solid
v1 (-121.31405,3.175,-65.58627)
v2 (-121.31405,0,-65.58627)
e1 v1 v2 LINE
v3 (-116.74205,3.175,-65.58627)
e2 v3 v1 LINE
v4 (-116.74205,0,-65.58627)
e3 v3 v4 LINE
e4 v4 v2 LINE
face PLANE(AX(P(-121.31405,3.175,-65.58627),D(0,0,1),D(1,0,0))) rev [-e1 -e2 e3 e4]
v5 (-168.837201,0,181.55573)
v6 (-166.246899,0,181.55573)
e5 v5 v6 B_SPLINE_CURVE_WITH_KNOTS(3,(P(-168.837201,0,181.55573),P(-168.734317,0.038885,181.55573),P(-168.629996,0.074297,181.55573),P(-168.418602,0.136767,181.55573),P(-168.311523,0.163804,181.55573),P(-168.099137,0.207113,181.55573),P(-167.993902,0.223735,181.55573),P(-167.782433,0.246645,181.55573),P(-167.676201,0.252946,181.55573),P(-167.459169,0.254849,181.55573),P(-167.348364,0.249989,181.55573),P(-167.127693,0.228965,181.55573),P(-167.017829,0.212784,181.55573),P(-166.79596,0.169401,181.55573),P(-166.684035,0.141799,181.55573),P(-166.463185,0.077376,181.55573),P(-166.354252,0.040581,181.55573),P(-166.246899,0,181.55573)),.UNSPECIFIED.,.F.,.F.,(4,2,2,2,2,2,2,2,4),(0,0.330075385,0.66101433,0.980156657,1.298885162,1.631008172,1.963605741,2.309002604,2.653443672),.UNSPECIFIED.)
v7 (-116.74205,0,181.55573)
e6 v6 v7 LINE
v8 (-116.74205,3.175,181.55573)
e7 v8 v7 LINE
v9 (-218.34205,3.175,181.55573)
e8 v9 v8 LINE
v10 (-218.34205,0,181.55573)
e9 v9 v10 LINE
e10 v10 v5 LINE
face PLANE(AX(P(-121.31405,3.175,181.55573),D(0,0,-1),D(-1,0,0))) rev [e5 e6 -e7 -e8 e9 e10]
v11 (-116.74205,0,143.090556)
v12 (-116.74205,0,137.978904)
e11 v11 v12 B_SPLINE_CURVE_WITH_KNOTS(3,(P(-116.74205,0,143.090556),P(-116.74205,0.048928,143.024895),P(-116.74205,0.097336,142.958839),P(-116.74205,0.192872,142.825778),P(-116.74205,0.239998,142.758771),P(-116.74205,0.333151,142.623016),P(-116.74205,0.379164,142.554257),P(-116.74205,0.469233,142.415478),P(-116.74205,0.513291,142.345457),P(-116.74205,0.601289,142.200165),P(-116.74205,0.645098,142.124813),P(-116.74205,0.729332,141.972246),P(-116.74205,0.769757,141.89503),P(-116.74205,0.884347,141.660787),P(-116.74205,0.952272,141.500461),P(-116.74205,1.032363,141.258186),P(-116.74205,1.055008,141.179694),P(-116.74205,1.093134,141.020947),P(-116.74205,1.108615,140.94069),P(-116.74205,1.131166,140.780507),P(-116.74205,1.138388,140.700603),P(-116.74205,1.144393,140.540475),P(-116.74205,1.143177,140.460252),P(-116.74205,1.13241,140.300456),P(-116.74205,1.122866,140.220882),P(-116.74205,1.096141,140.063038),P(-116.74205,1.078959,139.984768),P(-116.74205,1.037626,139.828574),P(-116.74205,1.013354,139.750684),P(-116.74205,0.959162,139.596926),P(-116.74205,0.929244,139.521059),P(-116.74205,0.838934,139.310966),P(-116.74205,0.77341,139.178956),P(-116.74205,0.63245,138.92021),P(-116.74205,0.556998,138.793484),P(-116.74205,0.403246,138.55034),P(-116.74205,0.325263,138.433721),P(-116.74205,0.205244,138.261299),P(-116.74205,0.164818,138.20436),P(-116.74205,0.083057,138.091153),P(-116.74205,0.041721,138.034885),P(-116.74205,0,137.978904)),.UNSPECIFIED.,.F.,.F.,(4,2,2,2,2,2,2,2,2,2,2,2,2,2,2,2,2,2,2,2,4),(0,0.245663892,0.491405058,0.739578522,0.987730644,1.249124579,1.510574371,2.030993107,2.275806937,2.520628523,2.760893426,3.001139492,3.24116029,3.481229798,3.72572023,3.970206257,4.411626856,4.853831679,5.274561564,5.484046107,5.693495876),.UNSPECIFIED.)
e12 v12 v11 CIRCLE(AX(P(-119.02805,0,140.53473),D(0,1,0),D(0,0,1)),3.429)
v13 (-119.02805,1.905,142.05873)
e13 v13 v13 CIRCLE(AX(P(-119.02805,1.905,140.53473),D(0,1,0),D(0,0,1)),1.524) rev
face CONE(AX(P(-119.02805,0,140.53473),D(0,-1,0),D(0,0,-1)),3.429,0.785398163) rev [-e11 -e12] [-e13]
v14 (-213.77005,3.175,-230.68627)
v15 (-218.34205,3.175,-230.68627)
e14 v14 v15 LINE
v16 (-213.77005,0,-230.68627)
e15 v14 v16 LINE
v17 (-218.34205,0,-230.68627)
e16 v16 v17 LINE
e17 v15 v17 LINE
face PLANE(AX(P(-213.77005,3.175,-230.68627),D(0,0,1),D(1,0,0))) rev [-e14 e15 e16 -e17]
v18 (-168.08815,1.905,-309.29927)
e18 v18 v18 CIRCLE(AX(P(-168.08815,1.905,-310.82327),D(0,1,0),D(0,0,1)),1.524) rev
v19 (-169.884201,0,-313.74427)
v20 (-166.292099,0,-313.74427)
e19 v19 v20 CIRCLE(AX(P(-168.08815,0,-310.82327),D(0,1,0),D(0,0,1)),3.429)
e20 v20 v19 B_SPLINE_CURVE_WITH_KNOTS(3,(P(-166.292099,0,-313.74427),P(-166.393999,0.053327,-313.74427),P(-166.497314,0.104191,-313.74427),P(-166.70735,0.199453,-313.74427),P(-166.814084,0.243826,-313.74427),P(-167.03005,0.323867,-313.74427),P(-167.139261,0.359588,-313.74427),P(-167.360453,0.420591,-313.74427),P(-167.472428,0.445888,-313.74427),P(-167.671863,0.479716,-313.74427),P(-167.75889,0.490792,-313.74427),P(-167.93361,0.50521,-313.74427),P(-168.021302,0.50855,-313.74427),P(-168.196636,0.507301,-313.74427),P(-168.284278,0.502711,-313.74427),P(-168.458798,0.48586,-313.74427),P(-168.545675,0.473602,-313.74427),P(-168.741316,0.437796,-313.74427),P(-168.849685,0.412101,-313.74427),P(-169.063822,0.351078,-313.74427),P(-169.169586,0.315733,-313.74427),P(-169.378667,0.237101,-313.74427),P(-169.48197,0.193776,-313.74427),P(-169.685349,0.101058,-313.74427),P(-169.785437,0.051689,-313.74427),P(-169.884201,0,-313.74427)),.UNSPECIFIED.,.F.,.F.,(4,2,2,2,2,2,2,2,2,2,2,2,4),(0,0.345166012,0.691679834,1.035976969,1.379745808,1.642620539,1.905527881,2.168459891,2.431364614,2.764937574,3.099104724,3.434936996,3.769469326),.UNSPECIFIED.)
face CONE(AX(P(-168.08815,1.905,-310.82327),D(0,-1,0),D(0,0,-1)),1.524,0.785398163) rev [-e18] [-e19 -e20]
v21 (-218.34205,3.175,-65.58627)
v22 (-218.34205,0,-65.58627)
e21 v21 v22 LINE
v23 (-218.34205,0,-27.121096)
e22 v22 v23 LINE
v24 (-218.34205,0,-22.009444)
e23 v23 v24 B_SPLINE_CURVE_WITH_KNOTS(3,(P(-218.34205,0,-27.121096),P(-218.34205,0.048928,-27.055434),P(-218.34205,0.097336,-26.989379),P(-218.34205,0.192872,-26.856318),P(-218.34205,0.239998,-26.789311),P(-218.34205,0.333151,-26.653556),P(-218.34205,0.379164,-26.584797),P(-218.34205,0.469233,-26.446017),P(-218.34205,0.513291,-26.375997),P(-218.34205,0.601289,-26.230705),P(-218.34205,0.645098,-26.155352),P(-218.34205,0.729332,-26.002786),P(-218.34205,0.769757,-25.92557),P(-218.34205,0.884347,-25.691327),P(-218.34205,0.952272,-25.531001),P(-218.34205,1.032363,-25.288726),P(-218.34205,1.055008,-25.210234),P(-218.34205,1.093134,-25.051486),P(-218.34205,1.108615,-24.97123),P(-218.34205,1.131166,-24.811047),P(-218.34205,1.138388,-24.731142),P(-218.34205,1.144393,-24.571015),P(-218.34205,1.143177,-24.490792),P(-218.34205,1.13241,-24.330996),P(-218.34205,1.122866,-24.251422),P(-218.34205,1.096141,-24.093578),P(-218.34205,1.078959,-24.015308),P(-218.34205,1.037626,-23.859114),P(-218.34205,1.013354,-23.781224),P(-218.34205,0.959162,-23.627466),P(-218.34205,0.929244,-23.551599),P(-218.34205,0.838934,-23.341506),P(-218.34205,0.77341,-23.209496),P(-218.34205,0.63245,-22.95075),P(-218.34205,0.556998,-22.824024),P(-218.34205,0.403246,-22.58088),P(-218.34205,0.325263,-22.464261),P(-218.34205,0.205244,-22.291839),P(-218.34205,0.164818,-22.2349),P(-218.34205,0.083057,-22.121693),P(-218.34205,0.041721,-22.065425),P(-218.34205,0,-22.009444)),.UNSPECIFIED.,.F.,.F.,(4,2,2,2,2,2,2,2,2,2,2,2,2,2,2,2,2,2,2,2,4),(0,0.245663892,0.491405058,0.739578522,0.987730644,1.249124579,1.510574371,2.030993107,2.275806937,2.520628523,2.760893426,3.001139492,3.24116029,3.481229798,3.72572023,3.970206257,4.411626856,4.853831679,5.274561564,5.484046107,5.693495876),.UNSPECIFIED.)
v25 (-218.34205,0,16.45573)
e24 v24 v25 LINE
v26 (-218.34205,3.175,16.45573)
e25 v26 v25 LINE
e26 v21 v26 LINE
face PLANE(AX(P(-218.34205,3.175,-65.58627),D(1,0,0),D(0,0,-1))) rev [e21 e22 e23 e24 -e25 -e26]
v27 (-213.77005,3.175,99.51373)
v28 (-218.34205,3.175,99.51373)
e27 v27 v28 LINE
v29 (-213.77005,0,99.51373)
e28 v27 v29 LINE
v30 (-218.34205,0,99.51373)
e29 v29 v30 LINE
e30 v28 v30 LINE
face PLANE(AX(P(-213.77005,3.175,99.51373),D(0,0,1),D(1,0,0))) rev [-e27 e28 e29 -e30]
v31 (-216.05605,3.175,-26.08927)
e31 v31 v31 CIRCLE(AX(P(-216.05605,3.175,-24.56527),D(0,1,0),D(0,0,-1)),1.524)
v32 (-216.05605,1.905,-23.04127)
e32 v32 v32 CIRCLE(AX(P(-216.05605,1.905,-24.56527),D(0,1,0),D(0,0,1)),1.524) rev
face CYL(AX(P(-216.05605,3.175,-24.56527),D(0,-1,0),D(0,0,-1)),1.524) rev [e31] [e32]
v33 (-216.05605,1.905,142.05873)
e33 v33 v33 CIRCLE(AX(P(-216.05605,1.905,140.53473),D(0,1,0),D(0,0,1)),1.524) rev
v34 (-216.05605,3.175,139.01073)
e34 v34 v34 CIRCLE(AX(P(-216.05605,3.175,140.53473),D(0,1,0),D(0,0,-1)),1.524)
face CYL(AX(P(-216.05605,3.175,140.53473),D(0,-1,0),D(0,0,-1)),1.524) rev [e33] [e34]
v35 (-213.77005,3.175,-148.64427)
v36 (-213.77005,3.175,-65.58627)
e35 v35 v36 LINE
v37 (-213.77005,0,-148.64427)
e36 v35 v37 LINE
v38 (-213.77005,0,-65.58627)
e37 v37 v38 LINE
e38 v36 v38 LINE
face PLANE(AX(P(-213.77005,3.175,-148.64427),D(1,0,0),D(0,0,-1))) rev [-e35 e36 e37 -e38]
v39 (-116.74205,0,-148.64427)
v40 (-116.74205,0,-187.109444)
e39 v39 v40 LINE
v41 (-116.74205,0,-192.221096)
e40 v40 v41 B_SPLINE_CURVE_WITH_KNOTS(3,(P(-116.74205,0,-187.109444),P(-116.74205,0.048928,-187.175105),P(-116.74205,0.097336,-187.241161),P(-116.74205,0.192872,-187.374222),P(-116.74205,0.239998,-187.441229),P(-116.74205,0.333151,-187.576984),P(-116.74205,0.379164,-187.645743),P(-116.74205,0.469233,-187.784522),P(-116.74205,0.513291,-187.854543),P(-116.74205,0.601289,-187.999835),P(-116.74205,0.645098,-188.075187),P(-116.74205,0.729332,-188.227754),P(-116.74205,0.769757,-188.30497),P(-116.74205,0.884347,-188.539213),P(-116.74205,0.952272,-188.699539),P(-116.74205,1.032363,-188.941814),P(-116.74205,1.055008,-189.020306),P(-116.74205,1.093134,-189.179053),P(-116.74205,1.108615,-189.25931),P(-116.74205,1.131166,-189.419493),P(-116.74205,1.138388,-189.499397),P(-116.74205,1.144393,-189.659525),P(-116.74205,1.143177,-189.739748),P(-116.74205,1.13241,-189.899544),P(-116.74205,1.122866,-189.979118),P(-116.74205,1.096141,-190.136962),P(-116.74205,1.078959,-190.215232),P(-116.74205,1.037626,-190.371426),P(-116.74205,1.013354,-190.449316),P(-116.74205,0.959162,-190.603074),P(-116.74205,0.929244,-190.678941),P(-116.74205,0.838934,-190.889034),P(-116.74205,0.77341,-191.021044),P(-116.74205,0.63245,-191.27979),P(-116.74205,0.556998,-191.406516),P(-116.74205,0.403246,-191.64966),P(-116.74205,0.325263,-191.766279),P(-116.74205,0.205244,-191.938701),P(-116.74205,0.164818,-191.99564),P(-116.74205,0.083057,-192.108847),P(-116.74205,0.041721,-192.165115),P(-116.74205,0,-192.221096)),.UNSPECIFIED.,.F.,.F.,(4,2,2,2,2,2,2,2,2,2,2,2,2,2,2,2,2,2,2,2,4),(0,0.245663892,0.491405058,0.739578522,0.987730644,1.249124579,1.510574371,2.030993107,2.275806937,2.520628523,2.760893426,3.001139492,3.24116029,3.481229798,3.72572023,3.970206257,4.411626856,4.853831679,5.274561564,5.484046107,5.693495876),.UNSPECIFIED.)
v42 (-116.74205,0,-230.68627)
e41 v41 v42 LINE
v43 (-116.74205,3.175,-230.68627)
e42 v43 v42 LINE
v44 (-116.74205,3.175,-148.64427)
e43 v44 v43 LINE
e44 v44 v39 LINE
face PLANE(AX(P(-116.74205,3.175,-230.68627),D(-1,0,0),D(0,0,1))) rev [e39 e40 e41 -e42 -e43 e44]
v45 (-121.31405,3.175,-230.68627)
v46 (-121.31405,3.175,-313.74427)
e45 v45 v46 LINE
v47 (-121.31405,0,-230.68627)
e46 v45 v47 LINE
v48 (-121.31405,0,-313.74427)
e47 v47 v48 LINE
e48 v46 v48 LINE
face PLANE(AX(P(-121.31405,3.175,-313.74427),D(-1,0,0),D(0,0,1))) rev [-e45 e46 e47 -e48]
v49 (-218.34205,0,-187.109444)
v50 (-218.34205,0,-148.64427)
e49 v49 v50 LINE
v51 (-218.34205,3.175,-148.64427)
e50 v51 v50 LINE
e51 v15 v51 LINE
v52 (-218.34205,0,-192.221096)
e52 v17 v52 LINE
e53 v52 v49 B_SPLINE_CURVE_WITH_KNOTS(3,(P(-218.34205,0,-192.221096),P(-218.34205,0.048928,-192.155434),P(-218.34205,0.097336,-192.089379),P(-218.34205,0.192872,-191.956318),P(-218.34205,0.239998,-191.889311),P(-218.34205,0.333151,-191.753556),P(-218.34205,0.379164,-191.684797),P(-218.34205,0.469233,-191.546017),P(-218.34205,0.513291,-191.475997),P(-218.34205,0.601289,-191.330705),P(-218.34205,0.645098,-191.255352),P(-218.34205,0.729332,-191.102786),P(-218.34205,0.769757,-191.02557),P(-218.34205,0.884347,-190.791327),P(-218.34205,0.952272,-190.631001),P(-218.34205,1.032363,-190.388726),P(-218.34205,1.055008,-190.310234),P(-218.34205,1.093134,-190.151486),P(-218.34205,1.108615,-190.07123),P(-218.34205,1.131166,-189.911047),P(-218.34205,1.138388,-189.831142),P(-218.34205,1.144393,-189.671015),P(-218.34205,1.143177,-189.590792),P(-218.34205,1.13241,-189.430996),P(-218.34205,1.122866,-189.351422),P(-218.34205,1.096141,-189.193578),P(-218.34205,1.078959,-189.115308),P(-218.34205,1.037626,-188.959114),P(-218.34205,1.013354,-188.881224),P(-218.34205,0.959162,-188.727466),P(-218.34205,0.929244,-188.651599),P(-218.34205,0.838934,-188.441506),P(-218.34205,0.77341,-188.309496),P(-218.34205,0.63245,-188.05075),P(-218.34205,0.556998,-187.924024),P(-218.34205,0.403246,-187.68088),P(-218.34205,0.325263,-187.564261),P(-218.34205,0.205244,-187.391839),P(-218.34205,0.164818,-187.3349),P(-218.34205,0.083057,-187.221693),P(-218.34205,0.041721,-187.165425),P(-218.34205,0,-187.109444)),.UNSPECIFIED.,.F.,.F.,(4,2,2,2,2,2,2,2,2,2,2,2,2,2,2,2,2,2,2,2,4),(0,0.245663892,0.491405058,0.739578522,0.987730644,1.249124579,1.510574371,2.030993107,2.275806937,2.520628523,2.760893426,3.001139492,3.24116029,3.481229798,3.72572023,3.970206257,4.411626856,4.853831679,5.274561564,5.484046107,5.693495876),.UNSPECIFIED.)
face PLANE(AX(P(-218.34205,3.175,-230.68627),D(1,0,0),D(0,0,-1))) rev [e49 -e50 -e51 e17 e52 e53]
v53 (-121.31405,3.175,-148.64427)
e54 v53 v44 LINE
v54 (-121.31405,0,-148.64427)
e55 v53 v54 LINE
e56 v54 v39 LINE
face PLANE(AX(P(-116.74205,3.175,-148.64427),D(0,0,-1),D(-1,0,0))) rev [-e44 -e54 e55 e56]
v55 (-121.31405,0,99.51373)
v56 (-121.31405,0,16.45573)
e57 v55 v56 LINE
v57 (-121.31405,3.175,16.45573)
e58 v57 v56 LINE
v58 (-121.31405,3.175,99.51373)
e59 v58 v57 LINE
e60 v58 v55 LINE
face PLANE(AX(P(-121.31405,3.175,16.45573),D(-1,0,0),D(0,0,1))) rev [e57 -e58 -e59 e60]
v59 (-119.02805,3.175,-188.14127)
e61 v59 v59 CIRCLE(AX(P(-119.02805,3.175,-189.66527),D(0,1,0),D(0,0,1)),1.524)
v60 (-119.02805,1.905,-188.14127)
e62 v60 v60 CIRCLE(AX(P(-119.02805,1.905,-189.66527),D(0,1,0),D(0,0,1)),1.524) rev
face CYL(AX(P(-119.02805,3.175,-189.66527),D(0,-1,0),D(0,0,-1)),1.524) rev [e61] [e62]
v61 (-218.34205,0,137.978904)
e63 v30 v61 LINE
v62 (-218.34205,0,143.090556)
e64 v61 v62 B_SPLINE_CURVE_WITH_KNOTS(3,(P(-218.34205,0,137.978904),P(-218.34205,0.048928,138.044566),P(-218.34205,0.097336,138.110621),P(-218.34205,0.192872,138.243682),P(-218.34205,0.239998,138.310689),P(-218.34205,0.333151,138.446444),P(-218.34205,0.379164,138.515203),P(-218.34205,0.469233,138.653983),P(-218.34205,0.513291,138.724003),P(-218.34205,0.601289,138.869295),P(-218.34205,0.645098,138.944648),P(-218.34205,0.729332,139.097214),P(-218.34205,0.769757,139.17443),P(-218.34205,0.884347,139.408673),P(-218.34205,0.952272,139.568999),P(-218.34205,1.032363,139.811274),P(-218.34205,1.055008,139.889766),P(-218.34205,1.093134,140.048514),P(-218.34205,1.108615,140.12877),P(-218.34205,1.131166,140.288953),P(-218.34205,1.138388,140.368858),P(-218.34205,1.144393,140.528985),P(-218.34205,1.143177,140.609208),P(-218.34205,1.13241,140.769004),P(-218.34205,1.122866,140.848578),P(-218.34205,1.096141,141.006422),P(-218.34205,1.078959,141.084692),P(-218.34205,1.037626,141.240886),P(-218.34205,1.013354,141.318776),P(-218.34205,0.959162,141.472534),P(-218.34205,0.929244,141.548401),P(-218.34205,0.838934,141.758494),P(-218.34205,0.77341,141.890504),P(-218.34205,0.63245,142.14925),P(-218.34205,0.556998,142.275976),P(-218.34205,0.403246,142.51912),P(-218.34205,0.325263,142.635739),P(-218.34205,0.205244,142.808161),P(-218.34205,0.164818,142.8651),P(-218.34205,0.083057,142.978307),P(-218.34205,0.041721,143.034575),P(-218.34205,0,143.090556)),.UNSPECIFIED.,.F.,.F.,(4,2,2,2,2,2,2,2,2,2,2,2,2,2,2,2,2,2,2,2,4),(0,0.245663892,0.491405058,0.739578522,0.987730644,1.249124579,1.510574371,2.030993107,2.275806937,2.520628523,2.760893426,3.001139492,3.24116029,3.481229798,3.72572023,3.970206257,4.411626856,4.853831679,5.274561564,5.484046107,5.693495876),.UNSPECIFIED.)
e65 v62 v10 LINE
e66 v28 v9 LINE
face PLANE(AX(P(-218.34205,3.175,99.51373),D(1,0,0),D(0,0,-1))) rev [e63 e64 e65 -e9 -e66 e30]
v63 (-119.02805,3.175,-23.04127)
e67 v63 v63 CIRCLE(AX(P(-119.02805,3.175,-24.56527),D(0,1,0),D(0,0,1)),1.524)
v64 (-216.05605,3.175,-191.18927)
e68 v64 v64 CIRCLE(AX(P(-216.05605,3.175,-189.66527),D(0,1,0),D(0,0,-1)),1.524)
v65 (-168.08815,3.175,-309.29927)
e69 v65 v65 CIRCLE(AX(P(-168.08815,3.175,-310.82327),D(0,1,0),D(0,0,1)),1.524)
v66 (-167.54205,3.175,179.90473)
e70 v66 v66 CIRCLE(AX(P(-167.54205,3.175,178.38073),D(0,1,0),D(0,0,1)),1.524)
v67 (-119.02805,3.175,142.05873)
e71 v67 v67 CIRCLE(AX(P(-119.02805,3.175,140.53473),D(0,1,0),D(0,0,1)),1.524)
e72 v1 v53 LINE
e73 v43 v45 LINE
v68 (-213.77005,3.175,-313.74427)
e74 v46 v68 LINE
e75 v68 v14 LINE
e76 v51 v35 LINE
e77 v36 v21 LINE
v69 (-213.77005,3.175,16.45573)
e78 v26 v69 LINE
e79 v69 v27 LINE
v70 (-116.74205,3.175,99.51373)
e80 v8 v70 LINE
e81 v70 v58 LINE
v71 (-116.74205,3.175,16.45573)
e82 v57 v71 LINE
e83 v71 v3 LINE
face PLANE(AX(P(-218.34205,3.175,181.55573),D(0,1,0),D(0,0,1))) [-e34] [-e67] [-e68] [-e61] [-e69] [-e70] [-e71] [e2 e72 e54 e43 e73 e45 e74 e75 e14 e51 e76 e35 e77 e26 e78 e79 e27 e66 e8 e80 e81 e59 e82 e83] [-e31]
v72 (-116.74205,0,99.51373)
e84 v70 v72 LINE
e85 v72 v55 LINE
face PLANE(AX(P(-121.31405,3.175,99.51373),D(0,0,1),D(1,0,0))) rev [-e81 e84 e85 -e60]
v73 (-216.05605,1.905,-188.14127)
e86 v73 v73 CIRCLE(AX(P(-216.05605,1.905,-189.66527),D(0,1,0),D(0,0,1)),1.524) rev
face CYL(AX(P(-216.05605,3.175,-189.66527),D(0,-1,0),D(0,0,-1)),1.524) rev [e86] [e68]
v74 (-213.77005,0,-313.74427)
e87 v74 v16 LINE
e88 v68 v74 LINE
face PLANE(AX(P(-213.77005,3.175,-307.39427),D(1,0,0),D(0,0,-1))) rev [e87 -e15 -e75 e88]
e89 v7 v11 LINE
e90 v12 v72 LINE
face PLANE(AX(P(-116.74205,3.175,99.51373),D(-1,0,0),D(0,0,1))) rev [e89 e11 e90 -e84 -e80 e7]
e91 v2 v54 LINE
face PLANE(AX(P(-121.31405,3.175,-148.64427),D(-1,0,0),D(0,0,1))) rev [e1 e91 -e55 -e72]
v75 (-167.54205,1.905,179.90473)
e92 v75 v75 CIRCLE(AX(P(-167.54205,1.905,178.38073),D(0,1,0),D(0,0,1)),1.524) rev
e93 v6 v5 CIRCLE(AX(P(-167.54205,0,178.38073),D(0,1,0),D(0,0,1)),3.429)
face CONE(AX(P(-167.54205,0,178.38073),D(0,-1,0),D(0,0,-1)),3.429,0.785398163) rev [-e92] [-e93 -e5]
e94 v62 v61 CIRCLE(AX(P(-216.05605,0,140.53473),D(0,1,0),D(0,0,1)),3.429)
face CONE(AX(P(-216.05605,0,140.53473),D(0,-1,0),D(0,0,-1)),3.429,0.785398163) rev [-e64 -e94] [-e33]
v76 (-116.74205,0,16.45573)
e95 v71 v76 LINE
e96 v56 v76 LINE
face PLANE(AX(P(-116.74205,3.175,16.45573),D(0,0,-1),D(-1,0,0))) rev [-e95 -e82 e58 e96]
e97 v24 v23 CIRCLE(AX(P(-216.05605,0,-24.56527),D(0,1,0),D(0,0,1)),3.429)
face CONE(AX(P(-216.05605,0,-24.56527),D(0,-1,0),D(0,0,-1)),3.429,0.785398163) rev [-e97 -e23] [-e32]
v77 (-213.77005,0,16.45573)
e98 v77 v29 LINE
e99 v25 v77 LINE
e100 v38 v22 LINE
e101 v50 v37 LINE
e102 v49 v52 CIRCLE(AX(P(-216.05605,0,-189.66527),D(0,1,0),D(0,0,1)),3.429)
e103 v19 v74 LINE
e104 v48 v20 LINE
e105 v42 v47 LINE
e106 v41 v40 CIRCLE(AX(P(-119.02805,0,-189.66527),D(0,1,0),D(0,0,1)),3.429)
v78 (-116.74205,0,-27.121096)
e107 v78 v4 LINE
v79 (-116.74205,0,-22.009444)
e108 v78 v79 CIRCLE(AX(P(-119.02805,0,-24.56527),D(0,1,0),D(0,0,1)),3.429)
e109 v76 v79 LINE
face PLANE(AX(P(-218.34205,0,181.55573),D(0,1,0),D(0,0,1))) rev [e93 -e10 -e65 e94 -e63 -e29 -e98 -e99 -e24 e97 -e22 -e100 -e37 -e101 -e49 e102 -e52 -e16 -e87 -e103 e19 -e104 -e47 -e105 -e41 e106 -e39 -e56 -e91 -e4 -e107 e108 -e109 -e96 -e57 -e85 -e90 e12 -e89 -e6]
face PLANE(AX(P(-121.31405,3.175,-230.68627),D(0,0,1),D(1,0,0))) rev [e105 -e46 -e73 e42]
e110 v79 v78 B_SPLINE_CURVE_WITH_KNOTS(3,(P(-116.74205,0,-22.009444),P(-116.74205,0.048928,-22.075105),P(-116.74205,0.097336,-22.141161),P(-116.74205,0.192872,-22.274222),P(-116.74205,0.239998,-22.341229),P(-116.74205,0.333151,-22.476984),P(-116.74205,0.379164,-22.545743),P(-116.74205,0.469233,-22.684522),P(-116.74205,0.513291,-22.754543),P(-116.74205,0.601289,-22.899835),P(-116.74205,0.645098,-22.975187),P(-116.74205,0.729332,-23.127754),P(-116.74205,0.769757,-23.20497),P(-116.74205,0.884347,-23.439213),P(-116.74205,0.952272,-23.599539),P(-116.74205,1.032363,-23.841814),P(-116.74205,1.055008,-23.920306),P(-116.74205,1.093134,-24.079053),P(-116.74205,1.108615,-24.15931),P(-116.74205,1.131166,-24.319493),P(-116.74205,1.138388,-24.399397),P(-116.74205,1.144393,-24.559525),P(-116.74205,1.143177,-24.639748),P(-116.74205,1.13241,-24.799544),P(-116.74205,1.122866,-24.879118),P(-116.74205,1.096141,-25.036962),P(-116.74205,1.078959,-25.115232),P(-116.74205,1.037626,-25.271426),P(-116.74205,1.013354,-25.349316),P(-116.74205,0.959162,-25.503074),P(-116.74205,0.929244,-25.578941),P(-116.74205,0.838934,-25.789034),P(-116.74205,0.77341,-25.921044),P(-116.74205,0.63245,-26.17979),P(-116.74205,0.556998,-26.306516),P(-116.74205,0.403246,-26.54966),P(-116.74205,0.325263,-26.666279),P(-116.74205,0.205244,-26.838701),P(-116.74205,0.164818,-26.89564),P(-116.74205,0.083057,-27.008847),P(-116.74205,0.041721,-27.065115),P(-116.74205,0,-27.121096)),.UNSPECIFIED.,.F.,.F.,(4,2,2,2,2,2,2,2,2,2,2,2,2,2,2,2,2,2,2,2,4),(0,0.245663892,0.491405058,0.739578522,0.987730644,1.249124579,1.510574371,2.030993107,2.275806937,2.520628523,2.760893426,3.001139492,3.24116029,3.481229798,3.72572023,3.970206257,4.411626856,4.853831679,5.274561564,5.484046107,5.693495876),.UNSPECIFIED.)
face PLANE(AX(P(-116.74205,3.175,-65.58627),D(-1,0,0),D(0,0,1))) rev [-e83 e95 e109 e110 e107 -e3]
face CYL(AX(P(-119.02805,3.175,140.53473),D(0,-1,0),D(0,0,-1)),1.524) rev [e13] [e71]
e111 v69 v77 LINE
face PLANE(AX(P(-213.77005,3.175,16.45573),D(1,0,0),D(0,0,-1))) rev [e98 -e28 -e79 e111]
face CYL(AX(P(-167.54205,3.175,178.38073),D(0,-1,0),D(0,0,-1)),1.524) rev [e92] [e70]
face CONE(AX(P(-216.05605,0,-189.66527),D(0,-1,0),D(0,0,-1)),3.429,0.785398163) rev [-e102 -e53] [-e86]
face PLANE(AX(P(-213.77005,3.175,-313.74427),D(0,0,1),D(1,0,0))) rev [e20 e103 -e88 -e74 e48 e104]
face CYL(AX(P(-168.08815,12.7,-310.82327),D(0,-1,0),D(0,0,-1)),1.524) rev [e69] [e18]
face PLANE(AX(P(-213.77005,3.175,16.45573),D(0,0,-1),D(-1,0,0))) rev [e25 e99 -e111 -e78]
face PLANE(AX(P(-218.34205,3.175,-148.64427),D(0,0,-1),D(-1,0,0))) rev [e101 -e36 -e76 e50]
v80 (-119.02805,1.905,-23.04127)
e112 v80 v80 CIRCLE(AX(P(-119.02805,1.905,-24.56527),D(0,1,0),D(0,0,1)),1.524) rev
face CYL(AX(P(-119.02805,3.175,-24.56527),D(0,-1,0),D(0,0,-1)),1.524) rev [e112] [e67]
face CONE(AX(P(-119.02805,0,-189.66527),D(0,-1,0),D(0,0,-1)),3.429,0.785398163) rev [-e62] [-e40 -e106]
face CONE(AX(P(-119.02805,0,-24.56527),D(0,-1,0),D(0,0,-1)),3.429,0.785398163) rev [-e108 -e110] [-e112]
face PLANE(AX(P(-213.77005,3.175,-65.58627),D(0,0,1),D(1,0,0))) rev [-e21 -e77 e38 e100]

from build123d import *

# Parameters (mm, degrees)
SKETCH1_R           = 1.524
BOSS_EXTRUDE1_DEPTH = 3.175
SKETCH2_R           = 1.524
CUT_EXTRUDE1_DEPTH  = 12.7
CHAMFER1_SIZE       = 1.905


with BuildPart() as part:
    # Sketch1 → Boss-Extrude1 (new body)
    with BuildSketch(Plane(origin=(0, 0, 0), x_dir=(1, 0, 0), z_dir=(0, 1, 0))):
        Polygon((-116.742050037, 65.586269915), (-116.742050037, -16.455730085), (-121.314050037, -16.455730085), (-121.314050037, -99.513730085), (-116.742050037, -99.513730085), (-116.742050037, -181.555730085), (-121.314050037, -181.555730085), (-213.770050037, -181.555730085), (-218.342050037, -181.555730085), (-218.342050037, -99.513730085), (-213.770050037, -99.513730085), (-213.770050037, -16.455730085), (-218.342050037, -16.455730085), (-218.342050037, 65.586269915), (-213.770050037, 65.586269915), (-213.770050037, 148.644269915), (-218.342050037, 148.644269915), (-218.342050037, 230.686269915), (-213.770050037, 230.686269915), (-213.770050037, 307.394269915), (-213.770050037, 313.744269915), (-121.314050037, 313.744269915), (-121.314050037, 307.394269915), (-121.314050037, 230.686269915), (-116.742050037, 230.686269915), (-116.742050037, 148.644269915), (-121.314050037, 148.644269915), (-121.314050037, 65.586269915), align=None)
        with Locations(Location((-119.028050037, 189.665269915, 0), (0, 0, 270))):
            Circle(SKETCH1_R, mode=Mode.SUBTRACT)
        with Locations(Location((-119.028050037, 24.565269915, 0), (0, 0, 270))):
            Circle(SKETCH1_R, mode=Mode.SUBTRACT)
        with Locations(Location((-119.028050037, -140.534730085, 0), (0, 0, 270))):
            Circle(SKETCH1_R, mode=Mode.SUBTRACT)
        with Locations(Location((-216.056050037, 189.665269915, 0), (0, 0, 90))):
            Circle(SKETCH1_R, mode=Mode.SUBTRACT)
        with Locations(Location((-216.056050037, 24.565269915, 0), (0, 0, 90))):
            Circle(SKETCH1_R, mode=Mode.SUBTRACT)
        with Locations(Location((-216.056050037, -140.534730085, 0), (0, 0, 90))):
            Circle(SKETCH1_R, mode=Mode.SUBTRACT)
        with Locations(Location((-167.542050037, -178.380730085, 0), (0, 0, 270))):
            Circle(SKETCH1_R, mode=Mode.SUBTRACT)
    extrude(amount=BOSS_EXTRUDE1_DEPTH)

    # Sketch2 → Cut-Extrude1 (cut)
    with BuildSketch(Plane.XZ):
        with Locations(Location((-168.088150037, -310.823269915, 0), (0, 0, 270))):
            Circle(SKETCH2_R)
    extrude(amount=-CUT_EXTRUDE1_DEPTH, mode=Mode.SUBTRACT)

    # Chamfer1
    # the kernel refuses this chamfer: 1.905 mm, written as the material it takes off along each edge
    with BuildSketch(Plane(origin=(-168.088150037, 0, -310.823269915), x_dir=(0, 0, -1), z_dir=(-1, 0, 0))) as chamfer1_piece_1:
        Polygon((1.524 + CHAMFER1_SIZE, 0), (1.524, -CHAMFER1_SIZE), (1.524, 0), align=None)
    revolve(axis=Axis((-168.088150037, 0, -310.823269915), (0, -1, 0)), mode=Mode.SUBTRACT)
    with BuildSketch(Plane(origin=(-119.028050037, 0, -189.665269915), x_dir=(0, 0, 1), z_dir=(-1, 0, 0))) as chamfer1_piece_2:
        Polygon((1.524 + CHAMFER1_SIZE, 0), (1.524, CHAMFER1_SIZE), (1.524, 0), align=None)
    revolve(axis=Axis((-119.028050037, 0, -189.665269915), (0, 1, 0)), mode=Mode.SUBTRACT)
    with BuildSketch(Plane(origin=(-119.028050037, 0, -24.565269915), x_dir=(0, 0, 1), z_dir=(-1, 0, 0))) as chamfer1_piece_3:
        Polygon((1.524 + CHAMFER1_SIZE, 0), (1.524, CHAMFER1_SIZE), (1.524, 0), align=None)
    revolve(axis=Axis((-119.028050037, 0, -24.565269915), (0, 1, 0)), mode=Mode.SUBTRACT)
    with BuildSketch(Plane(origin=(-216.056050037, 0, -189.665269915), x_dir=(0, 0, -1), z_dir=(1, 0, 0))) as chamfer1_piece_4:
        Polygon((1.524 + CHAMFER1_SIZE, 0), (1.524, CHAMFER1_SIZE), (1.524, 0), align=None)
    revolve(axis=Axis((-216.056050037, 0, -189.665269915), (0, 1, 0)), mode=Mode.SUBTRACT)
    with BuildSketch(Plane(origin=(-119.028050037, 0, 140.534730085), x_dir=(0, 0, 1), z_dir=(-1, 0, 0))) as chamfer1_piece_5:
        Polygon((1.524 + CHAMFER1_SIZE, 0), (1.524, CHAMFER1_SIZE), (1.524, 0), align=None)
    revolve(axis=Axis((-119.028050037, 0, 140.534730085), (0, 1, 0)), mode=Mode.SUBTRACT)
    with BuildSketch(Plane(origin=(-216.056050037, 0, -24.565269915), x_dir=(0, 0, -1), z_dir=(1, 0, 0))) as chamfer1_piece_6:
        Polygon((1.524 + CHAMFER1_SIZE, 0), (1.524, CHAMFER1_SIZE), (1.524, 0), align=None)
    revolve(axis=Axis((-216.056050037, 0, -24.565269915), (0, 1, 0)), mode=Mode.SUBTRACT)
    with BuildSketch(Plane(origin=(-216.056050037, 0, 140.534730085), x_dir=(0, 0, -1), z_dir=(1, 0, 0))) as chamfer1_piece_7:
        Polygon((1.524 + CHAMFER1_SIZE, 0), (1.524, CHAMFER1_SIZE), (1.524, 0), align=None)
    revolve(axis=Axis((-216.056050037, 0, 140.534730085), (0, 1, 0)), mode=Mode.SUBTRACT)
    with BuildSketch(Plane(origin=(-167.542050037, 0, 178.380730085), x_dir=(0, 0, 1), z_dir=(-1, 0, 0))) as chamfer1_piece_8:
        Polygon((1.524 + CHAMFER1_SIZE, 0), (1.524, CHAMFER1_SIZE), (1.524, 0), align=None)
    revolve(axis=Axis((-167.542050037, 0, 178.380730085), (0, 1, 0)), mode=Mode.SUBTRACT)


solid = part.part
